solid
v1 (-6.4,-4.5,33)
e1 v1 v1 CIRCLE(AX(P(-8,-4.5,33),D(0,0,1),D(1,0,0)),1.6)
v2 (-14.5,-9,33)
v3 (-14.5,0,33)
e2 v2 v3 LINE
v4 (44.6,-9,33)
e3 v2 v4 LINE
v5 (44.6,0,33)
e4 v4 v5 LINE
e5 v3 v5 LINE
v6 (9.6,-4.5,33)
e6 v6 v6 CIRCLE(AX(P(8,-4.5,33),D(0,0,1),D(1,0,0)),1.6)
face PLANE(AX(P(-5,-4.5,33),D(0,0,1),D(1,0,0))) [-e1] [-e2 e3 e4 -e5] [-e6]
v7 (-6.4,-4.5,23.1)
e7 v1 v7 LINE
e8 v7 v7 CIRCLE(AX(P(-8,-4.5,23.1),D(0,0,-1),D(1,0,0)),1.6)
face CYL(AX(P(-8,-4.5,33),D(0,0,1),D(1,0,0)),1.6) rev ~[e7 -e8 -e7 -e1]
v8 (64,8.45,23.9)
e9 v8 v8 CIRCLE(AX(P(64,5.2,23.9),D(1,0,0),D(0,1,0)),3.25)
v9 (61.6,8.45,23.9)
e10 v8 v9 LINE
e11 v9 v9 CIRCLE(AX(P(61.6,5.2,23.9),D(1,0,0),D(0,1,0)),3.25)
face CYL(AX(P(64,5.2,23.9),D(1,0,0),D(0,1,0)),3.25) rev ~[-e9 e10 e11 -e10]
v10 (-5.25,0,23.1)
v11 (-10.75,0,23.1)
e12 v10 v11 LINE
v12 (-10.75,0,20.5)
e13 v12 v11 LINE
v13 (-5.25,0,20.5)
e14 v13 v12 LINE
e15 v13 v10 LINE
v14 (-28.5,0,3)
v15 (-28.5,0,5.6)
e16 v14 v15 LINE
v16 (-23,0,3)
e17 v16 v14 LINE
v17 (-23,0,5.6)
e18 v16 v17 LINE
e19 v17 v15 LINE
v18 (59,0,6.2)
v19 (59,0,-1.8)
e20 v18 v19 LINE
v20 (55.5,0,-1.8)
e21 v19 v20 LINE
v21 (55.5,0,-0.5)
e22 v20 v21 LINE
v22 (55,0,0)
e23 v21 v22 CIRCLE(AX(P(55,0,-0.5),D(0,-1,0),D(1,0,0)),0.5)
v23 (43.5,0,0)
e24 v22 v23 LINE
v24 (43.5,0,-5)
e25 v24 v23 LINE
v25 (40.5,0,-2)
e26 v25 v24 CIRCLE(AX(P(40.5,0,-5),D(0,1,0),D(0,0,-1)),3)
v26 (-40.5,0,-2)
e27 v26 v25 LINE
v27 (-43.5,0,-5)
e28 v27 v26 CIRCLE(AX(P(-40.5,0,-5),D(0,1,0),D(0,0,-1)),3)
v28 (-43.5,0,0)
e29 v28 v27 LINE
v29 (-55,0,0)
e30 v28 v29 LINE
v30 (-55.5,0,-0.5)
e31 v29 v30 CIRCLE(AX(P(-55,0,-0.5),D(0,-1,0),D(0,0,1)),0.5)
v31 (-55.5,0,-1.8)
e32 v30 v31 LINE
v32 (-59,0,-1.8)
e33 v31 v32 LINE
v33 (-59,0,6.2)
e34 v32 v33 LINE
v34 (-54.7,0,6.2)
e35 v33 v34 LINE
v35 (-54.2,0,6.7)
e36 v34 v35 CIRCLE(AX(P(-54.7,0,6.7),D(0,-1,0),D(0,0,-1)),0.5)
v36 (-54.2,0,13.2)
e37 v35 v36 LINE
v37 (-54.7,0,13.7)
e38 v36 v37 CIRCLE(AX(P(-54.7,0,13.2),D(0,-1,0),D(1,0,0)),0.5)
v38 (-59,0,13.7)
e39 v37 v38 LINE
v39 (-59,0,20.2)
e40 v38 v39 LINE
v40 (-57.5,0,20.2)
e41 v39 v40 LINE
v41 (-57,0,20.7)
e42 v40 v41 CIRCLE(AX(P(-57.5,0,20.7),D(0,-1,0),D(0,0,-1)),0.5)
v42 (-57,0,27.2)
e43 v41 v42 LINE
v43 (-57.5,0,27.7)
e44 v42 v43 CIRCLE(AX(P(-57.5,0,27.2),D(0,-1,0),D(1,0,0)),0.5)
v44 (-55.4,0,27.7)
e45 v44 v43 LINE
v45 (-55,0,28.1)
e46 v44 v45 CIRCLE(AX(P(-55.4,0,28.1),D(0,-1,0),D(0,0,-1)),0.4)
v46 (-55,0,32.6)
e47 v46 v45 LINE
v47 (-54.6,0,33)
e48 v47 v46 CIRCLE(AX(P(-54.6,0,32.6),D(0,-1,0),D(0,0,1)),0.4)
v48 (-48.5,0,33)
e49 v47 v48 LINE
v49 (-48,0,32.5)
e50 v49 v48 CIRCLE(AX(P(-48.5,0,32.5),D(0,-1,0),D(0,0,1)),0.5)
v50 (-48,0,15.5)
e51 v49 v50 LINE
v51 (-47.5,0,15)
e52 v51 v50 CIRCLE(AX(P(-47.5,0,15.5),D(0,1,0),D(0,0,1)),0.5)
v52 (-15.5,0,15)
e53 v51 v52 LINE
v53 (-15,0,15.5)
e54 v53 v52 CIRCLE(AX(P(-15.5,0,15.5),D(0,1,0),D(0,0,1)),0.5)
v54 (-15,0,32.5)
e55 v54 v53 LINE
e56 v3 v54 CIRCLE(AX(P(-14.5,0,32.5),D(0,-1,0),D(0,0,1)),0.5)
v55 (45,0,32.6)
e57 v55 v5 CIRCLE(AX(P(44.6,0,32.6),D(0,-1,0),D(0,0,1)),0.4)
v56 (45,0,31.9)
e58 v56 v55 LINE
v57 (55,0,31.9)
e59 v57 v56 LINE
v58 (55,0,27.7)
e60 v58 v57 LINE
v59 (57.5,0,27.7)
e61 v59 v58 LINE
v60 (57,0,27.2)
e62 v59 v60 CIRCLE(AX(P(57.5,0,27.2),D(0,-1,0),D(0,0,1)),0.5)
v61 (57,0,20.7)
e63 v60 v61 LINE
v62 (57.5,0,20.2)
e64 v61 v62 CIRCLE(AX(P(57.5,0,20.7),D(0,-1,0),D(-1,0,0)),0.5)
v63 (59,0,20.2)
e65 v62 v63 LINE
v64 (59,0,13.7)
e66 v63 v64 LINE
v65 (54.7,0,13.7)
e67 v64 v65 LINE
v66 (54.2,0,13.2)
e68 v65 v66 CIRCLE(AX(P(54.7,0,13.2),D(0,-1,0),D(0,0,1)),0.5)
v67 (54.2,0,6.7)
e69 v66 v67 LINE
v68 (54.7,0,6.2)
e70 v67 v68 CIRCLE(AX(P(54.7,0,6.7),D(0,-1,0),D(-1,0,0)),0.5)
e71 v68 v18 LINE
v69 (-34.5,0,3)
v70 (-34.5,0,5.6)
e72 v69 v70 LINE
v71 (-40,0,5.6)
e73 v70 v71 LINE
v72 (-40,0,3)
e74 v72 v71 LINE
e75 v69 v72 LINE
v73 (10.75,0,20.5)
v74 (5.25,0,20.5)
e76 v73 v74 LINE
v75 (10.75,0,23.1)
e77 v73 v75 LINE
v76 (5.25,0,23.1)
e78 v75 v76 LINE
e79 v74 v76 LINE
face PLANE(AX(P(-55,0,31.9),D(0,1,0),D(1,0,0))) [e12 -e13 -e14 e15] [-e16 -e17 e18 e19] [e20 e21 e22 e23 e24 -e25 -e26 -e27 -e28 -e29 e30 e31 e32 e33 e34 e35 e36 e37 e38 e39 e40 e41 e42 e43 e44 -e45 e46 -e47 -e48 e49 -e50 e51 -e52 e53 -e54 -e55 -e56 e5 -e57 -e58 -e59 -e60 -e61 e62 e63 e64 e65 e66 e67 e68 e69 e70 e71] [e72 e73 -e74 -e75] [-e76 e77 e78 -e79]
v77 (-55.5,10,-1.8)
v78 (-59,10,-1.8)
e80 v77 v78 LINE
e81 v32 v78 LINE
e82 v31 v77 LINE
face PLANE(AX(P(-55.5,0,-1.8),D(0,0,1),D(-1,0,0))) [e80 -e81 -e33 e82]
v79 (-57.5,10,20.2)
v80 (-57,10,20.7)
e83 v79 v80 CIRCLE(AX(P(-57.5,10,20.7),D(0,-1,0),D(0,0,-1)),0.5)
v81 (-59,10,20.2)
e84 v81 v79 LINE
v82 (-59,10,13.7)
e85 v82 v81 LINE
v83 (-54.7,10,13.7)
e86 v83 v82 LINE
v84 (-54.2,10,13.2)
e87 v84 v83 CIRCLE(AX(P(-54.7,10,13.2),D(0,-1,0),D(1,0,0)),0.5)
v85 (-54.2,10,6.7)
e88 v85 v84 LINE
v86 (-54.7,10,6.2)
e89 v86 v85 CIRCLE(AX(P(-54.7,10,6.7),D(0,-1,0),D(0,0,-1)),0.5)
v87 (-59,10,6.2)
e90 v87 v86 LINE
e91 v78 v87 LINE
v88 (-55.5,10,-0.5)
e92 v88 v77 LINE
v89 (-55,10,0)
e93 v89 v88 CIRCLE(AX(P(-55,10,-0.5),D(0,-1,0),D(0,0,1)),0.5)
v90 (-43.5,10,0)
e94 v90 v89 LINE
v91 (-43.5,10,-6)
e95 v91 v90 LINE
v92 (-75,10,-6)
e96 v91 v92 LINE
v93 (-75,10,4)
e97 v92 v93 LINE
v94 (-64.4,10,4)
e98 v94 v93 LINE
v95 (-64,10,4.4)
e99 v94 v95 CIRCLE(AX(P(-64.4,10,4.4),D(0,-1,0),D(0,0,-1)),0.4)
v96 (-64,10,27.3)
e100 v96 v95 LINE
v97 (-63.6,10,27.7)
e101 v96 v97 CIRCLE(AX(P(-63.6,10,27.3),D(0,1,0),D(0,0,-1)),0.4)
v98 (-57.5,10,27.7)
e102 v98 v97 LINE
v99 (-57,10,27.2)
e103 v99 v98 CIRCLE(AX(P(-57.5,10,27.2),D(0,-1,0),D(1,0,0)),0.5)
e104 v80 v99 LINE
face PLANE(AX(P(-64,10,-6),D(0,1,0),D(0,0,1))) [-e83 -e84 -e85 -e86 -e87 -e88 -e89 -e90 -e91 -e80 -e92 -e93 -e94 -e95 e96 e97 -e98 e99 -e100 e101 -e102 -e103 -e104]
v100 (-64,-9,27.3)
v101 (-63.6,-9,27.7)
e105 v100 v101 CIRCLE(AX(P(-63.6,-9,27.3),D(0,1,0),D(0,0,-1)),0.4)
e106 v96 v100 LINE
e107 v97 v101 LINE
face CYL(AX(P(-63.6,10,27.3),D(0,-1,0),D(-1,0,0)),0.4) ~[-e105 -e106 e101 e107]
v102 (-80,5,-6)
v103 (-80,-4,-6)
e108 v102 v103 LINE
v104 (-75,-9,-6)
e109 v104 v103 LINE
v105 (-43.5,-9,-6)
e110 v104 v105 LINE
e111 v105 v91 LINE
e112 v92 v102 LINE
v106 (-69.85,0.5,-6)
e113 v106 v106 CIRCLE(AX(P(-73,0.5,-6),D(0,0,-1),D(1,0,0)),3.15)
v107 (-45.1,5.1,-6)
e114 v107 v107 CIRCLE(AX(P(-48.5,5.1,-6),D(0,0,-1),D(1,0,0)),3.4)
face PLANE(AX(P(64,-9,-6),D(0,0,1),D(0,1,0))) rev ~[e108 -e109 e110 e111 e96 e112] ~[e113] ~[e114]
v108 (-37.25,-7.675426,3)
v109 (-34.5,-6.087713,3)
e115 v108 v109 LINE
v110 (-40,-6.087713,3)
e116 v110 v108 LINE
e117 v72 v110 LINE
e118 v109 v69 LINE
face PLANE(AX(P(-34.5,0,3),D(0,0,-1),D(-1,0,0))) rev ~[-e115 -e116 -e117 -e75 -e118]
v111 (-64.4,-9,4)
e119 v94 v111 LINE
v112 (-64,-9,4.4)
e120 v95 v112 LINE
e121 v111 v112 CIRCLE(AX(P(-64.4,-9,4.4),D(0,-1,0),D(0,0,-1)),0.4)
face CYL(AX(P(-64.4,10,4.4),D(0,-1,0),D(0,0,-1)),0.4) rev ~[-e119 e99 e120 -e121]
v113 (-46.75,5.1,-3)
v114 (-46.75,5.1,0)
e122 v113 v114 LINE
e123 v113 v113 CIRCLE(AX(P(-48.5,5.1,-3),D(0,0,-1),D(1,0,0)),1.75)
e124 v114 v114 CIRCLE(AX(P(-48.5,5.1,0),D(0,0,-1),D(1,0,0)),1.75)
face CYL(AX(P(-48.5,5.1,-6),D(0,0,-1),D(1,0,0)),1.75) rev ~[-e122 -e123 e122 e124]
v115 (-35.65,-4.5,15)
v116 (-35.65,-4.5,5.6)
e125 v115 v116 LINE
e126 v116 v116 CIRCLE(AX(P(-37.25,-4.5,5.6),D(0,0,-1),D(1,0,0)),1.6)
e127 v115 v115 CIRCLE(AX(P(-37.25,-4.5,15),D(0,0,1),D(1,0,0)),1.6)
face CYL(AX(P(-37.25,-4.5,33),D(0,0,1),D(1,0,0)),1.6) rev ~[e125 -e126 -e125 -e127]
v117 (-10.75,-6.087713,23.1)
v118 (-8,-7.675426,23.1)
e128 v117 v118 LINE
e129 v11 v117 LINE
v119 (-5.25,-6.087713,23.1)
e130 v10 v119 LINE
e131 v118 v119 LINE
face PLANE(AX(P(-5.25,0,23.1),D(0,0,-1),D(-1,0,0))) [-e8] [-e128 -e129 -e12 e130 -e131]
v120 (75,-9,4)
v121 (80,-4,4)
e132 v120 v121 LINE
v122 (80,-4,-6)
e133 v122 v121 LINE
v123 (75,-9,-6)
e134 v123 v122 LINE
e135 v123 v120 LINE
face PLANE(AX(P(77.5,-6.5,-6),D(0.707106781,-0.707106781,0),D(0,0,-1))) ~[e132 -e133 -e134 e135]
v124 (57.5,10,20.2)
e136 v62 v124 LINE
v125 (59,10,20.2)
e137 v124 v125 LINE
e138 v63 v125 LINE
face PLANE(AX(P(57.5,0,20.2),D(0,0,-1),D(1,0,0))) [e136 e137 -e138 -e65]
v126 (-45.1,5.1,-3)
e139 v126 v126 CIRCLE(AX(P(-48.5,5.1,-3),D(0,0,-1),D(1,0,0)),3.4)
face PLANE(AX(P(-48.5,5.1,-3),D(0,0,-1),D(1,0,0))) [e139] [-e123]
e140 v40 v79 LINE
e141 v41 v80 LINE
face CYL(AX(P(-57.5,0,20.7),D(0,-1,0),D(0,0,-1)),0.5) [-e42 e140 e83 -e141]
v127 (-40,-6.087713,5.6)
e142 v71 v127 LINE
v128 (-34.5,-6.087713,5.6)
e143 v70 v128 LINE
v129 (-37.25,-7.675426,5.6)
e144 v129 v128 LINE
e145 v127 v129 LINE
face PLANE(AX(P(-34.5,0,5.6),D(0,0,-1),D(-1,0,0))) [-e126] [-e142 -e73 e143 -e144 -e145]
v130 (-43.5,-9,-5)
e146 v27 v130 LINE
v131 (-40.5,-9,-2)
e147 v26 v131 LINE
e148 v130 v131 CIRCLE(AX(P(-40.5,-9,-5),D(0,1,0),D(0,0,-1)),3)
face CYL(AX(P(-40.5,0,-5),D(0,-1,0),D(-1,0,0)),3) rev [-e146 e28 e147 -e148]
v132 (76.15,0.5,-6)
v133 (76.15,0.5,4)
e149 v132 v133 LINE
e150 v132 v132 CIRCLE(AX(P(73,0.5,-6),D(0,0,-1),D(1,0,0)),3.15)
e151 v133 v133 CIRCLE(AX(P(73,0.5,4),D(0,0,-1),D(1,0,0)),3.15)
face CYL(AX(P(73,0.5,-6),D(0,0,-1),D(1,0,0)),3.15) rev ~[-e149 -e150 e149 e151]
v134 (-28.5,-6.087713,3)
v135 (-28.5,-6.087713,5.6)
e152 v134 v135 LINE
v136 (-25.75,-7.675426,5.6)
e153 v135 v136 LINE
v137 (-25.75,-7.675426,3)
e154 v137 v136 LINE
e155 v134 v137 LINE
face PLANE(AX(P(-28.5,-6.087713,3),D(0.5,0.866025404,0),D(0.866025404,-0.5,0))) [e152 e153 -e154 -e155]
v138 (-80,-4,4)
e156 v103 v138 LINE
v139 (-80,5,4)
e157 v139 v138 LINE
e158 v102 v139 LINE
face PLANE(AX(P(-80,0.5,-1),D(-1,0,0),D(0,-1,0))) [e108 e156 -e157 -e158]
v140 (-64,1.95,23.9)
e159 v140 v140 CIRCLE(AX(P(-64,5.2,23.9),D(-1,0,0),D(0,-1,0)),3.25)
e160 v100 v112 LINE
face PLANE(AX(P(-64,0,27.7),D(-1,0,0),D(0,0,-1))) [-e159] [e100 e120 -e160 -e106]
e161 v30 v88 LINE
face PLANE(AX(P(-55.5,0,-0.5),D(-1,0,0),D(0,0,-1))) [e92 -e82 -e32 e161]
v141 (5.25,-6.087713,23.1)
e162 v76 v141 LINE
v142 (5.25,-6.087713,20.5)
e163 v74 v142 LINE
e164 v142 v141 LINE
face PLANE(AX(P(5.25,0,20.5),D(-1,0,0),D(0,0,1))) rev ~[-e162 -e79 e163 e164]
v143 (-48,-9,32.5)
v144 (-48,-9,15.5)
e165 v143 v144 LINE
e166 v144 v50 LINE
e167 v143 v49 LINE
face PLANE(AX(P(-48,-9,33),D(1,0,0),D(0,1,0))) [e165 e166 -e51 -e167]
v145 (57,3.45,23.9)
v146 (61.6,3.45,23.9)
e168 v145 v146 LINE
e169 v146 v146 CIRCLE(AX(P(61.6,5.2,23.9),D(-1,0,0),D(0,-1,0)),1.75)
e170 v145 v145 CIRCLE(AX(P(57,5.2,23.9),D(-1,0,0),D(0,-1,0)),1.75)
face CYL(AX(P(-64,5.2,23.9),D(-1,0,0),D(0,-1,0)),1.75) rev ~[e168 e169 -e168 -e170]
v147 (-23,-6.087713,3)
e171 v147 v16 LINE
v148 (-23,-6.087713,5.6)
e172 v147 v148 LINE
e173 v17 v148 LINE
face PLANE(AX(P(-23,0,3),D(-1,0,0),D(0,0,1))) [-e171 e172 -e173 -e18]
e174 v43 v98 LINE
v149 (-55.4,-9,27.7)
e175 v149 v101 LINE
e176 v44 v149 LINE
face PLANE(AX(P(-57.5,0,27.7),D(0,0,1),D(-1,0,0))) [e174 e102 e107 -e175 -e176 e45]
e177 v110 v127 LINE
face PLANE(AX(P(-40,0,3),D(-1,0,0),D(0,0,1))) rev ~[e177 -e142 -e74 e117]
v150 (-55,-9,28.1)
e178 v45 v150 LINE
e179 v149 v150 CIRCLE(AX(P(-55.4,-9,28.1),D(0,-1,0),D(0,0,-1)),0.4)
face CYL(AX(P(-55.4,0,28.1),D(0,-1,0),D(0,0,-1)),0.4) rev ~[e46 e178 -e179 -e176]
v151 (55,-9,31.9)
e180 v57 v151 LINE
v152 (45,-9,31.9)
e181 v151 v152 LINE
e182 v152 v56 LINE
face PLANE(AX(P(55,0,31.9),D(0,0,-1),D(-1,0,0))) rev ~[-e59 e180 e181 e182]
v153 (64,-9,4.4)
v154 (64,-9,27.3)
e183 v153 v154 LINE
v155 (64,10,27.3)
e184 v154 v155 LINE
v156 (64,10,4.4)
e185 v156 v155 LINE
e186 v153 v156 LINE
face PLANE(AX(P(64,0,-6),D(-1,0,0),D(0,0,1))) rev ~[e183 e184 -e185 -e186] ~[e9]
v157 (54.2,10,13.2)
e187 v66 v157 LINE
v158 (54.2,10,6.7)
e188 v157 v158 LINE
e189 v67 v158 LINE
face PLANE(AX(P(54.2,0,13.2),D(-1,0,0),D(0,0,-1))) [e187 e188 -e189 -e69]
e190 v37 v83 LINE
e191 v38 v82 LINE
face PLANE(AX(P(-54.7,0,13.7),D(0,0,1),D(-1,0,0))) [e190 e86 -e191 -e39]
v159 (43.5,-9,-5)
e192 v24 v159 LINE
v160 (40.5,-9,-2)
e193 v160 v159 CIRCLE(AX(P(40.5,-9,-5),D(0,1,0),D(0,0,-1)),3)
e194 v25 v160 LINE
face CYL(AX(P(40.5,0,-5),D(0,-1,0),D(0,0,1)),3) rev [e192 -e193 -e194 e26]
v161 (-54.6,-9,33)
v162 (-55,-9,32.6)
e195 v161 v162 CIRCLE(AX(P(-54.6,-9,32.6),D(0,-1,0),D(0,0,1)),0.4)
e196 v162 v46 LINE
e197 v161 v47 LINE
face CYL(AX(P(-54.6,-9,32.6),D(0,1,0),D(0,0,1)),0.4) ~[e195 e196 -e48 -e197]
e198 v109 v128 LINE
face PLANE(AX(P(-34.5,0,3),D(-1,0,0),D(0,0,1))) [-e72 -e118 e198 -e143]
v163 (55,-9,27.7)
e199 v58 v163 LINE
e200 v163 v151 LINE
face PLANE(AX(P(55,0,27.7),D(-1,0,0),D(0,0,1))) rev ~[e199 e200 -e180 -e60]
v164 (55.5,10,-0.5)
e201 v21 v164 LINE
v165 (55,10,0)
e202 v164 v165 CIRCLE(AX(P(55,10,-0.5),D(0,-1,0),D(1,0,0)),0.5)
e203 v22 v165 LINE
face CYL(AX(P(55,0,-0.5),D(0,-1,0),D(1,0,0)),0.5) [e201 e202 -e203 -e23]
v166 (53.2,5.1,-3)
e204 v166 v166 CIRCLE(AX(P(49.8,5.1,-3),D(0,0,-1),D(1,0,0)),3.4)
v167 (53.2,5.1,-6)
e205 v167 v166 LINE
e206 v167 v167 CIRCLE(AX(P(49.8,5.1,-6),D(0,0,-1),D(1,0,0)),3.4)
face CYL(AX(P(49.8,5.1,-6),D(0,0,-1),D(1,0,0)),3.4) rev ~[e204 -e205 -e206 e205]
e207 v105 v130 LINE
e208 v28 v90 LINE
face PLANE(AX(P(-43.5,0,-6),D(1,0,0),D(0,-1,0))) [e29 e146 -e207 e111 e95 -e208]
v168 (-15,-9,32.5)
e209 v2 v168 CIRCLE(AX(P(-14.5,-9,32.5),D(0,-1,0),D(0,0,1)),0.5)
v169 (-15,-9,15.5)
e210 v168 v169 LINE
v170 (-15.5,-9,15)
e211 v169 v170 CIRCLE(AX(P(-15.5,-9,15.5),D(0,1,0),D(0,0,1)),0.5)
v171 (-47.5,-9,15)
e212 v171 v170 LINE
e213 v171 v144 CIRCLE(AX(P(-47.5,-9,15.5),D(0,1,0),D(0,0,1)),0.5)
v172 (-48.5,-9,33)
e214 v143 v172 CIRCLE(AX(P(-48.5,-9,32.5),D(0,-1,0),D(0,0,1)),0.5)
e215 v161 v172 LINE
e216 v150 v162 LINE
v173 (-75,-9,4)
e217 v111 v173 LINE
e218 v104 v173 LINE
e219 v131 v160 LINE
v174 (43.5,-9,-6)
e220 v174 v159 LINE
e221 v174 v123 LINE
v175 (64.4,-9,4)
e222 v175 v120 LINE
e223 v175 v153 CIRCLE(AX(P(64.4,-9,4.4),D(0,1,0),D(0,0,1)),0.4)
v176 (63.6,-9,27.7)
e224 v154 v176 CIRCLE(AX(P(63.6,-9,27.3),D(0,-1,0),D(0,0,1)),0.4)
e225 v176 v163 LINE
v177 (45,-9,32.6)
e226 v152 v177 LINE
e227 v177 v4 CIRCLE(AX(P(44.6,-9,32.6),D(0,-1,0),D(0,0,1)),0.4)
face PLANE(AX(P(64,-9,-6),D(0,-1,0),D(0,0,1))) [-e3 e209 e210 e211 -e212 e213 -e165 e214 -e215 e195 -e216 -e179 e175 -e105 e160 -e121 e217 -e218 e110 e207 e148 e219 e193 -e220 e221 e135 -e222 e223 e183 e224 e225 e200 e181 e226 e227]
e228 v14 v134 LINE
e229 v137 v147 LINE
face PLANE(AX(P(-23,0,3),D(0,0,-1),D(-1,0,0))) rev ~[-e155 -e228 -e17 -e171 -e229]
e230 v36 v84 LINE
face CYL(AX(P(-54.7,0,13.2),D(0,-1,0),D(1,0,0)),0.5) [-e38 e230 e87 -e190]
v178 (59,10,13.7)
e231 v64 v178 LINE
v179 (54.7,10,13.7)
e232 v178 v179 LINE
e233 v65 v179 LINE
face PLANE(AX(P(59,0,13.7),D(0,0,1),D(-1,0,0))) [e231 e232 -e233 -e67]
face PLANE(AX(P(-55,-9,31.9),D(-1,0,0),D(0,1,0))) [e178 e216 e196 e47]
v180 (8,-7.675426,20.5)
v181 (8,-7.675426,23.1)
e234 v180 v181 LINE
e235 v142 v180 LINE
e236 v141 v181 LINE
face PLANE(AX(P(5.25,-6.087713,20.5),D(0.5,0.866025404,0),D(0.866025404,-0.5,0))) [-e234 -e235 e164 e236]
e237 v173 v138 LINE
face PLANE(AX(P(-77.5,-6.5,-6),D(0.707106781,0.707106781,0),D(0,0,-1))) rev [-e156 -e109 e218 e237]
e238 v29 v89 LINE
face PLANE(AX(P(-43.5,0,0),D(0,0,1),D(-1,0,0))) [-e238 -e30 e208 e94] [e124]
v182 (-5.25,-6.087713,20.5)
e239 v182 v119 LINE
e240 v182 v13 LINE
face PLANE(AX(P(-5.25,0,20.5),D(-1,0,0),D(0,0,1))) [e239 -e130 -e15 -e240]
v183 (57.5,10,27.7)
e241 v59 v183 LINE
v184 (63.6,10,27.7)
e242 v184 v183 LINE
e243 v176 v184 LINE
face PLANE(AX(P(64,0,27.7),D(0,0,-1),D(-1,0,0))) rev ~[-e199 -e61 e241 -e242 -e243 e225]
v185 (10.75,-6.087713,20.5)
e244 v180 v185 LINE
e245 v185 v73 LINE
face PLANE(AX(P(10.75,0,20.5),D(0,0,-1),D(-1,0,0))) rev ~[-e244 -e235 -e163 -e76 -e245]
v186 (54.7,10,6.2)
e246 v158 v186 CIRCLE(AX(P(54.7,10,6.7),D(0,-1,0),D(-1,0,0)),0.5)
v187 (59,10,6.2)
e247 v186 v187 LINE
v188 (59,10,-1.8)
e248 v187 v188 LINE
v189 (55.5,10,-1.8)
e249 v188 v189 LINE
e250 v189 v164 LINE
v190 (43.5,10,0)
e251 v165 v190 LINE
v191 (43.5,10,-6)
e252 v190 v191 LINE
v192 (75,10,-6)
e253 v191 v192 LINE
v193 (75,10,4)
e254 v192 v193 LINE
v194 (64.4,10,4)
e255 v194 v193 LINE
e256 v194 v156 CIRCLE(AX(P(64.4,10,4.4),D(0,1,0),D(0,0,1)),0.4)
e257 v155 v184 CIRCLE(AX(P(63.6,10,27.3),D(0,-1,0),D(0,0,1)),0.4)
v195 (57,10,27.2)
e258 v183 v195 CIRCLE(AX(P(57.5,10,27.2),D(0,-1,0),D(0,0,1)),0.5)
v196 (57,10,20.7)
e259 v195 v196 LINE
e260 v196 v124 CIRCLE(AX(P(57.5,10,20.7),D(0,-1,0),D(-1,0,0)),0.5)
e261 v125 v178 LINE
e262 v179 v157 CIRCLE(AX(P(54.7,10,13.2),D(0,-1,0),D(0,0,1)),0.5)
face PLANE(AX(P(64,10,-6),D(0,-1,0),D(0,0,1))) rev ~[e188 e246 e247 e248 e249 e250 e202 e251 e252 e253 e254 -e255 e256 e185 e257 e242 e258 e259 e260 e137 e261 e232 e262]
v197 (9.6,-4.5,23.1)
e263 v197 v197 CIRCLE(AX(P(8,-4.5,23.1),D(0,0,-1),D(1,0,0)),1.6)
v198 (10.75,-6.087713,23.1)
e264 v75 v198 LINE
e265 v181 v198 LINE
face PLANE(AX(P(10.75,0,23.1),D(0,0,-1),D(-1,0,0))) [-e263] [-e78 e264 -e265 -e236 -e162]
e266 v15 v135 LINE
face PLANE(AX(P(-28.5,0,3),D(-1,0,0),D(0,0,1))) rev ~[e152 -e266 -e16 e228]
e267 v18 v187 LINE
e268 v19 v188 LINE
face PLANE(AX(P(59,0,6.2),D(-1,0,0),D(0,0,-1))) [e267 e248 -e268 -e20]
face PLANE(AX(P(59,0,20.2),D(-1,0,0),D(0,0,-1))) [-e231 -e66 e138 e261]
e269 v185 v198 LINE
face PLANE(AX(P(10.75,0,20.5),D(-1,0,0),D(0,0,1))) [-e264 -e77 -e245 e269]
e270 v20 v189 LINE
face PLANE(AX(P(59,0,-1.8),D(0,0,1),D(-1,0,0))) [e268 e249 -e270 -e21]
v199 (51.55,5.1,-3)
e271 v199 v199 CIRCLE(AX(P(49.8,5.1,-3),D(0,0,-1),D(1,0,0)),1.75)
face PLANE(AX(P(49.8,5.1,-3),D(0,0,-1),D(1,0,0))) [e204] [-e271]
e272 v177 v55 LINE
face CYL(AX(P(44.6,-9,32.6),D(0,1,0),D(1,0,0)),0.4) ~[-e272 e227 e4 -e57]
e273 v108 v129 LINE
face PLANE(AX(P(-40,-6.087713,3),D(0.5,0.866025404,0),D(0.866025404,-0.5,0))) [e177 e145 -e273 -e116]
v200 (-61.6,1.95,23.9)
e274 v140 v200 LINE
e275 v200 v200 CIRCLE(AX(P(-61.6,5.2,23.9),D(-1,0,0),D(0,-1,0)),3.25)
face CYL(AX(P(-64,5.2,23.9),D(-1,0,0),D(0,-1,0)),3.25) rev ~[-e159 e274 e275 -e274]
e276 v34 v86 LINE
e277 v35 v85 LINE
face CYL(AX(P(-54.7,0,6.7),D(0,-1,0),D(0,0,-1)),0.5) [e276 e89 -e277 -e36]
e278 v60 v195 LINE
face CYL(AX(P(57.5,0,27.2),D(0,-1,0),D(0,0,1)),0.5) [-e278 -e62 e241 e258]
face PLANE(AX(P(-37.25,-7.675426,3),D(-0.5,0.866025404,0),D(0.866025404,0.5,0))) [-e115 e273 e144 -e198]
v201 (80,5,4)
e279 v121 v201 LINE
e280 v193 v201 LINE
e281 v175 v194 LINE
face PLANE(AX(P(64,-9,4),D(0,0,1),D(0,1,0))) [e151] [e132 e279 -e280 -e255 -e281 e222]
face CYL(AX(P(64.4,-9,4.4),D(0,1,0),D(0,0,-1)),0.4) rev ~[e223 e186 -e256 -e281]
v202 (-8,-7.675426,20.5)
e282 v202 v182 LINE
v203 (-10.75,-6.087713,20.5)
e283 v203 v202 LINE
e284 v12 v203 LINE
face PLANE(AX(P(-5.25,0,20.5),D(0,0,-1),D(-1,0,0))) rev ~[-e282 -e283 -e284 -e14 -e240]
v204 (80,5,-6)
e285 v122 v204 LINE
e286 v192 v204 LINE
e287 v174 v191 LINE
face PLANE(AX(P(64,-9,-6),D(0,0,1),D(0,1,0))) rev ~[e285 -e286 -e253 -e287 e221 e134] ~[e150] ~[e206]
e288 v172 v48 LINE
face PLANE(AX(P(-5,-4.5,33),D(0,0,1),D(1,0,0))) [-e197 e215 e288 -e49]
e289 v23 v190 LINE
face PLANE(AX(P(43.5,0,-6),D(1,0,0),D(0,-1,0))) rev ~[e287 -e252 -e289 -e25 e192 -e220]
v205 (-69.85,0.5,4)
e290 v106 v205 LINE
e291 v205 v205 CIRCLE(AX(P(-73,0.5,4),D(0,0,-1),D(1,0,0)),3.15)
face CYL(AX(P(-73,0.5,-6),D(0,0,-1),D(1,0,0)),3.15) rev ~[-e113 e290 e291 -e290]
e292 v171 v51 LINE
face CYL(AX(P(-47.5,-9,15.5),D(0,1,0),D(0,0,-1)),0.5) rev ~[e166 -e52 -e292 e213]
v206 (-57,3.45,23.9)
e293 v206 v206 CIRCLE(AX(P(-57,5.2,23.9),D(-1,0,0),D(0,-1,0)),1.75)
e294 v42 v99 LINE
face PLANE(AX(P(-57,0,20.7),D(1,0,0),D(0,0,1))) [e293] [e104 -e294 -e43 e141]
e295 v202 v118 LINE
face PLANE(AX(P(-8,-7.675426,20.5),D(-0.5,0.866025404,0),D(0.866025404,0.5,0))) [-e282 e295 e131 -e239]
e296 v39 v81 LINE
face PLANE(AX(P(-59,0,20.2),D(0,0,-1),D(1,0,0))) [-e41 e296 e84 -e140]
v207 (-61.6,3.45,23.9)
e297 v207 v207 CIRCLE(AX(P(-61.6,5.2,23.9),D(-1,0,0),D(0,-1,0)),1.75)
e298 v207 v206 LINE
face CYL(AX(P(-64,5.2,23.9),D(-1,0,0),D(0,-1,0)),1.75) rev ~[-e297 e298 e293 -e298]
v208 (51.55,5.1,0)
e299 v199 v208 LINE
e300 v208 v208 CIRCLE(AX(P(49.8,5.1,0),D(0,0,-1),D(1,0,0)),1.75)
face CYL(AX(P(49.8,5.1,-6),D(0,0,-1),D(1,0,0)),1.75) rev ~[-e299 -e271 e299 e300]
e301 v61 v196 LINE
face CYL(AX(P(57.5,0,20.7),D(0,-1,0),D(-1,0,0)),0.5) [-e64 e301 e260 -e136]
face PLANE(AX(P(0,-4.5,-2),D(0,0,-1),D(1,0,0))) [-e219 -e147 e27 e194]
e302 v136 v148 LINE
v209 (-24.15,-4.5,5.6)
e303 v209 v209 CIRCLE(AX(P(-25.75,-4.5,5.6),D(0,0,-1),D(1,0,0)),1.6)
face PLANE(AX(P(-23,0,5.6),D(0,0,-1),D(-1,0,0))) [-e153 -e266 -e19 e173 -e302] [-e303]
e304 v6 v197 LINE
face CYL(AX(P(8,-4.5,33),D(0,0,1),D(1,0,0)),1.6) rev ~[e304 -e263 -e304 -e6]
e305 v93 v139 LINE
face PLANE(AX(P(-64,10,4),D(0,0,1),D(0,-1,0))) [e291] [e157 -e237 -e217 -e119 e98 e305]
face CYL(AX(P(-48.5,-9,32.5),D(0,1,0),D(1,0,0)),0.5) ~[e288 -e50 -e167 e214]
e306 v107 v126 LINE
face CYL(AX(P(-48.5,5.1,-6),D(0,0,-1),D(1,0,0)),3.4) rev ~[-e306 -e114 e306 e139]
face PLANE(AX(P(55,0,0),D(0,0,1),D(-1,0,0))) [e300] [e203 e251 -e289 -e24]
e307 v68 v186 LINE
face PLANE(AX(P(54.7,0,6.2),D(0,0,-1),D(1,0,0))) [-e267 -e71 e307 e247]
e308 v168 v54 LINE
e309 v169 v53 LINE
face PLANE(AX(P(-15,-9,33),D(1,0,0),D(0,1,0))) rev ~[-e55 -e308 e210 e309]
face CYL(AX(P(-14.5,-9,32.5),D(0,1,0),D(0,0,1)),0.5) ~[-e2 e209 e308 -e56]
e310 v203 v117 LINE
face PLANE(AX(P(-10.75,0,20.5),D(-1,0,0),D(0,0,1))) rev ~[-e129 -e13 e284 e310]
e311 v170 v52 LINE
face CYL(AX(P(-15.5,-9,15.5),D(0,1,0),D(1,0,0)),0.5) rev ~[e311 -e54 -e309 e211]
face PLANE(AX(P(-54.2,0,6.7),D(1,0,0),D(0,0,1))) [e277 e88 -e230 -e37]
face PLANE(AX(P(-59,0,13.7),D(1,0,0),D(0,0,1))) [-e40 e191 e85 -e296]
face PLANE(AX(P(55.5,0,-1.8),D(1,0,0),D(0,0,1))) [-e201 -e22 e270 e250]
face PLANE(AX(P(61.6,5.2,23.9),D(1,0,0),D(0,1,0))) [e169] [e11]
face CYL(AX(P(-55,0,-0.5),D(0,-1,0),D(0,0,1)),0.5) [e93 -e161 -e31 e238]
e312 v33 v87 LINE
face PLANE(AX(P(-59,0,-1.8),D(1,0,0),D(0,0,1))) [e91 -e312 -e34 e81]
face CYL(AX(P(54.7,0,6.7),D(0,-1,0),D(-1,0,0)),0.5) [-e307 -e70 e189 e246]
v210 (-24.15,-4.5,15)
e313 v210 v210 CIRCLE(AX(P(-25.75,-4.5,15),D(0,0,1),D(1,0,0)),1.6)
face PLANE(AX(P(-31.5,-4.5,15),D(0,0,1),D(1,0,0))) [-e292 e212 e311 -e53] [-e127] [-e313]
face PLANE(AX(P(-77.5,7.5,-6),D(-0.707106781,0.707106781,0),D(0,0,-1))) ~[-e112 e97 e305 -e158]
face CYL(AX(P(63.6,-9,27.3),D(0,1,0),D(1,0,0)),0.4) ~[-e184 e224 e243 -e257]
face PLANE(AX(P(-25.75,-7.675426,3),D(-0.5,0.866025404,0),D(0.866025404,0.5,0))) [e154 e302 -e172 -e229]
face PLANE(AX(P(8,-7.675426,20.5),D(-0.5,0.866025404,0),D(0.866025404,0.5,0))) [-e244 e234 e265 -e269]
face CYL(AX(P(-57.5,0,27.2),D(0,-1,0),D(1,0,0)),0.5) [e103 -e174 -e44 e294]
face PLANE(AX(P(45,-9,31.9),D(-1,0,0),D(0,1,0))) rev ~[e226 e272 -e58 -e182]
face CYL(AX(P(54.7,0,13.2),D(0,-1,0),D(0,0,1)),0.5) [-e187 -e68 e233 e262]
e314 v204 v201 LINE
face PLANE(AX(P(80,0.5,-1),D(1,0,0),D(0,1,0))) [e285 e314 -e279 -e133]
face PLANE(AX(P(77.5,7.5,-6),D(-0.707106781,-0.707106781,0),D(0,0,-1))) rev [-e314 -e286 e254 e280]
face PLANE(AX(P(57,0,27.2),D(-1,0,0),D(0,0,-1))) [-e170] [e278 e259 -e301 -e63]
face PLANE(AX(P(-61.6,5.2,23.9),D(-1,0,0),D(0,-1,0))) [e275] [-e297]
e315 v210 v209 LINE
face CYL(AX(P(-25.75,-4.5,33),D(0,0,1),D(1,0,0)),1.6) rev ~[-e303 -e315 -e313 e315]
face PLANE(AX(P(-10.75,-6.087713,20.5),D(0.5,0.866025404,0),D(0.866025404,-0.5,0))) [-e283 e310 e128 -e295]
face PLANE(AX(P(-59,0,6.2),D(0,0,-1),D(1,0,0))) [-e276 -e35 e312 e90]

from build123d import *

# Parameters (mm, degrees)
F2_DEPTH  = 9
F3_DEPTH  = 10
F4_R      = 1.75
F5_DEPTH  = 158.2
F4_R_2    = 3.25
F6_DEPTH  = 2.4
F7_R      = 3.25
F8_DEPTH  = 2.4
F9_R      = 3.4
F9_R_2    = 1.75
F10_DEPTH = 3
F11_DEPTH = 25
F12_W     = 100
F12_H     = 9
F13_DEPTH = 1.1
F14_W     = 19
F14_H     = 10
F15_DEPTH = 16
F16_SIZE  = 5
F17_W     = 19
F17_H     = 10
F18_DEPTH = 16
F19_SIZE  = 5
F20_R     = 3.15
F21_DEPTH = 25
F22_R     = 0.4
F23_W     = 87
F23_H     = 9
F24_DEPTH = 4
F25_R     = 3
F26_W     = 33
F26_H     = 9
F26_R     = 1.6
F27_DEPTH = 18
F28_DEPTH = 30
F30_DEPTH = 2.6
F31_R     = 1.6
F32_DEPTH = 12.5
F34_DEPTH = 2.6
F35_W     = 5.5
F35_H     = 2.6
F36_DEPTH = 3.7
F37_R     = 0.5


with BuildPart() as f2:
    # F1 (on face) → F2 (new body)
    with BuildSketch(Plane.XZ):
        Polygon((-55, 27.7), (-64, 27.7), (-64, -6), (0, -6), (64, -6), (64, 27.7), (55, 27.7), (55, 31.9), (0, 31.9), (-55, 31.9), align=None)
    extrude(amount=F2_DEPTH)

    # F0 (on Front) → F3 (join)
    with BuildSketch(Plane.XZ):
        with BuildLine():
            Line((-57.5, 27.7), (-64, 27.7))
            Line((-64, 27.7), (-64, -6))
            Line((-64, -6), (-43.5, -6))
            Line((-43.5, -6), (-43.5, 0))
            Line((-43.5, 0), (-55, 0))
            ThreePointArc((-55, 0), (-55.3535533906, -0.1464466094), (-55.5, -0.5))
            Line((-55.5, -0.5), (-55.5, -1.8))
            Line((-55.5, -1.8), (-59, -1.8))
            Line((-59, -1.8), (-59, 6.2))
            Line((-59, 6.2), (-54.7, 6.2))
            ThreePointArc((-54.7, 6.2), (-54.3464466094, 6.3464466094), (-54.2, 6.7))
            Line((-54.2, 6.7), (-54.2, 13.2))
            ThreePointArc((-54.2, 13.2), (-54.3464466094, 13.5535533906), (-54.7, 13.7))
            Line((-54.7, 13.7), (-59, 13.7))
            Line((-59, 13.7), (-59, 20.2))
            Line((-59, 20.2), (-57.5, 20.2))
            ThreePointArc((-57.5, 20.2), (-57.1464466094, 20.3464466094), (-57, 20.7))
            Line((-57, 20.7), (-57, 27.2))
            ThreePointArc((-57, 27.2), (-57.1464466094, 27.5535533906), (-57.5, 27.7))
        make_face()
        with BuildLine():
            Line((43.5, -6), (64, -6))
            Line((64, -6), (64, 27.7))
            Line((64, 27.7), (57.5, 27.7))
            ThreePointArc((57.5, 27.7), (57.1464466094, 27.5535533906), (57, 27.2))
            Line((57, 27.2), (57, 20.7))
            ThreePointArc((57, 20.7), (57.1464466094, 20.3464466094), (57.5, 20.2))
            Line((57.5, 20.2), (59, 20.2))
            Line((59, 20.2), (59, 13.7))
            Line((59, 13.7), (54.7, 13.7))
            ThreePointArc((54.7, 13.7), (54.3464466094, 13.5535533906), (54.2, 13.2))
            Line((54.2, 13.2), (54.2, 6.7))
            ThreePointArc((54.2, 6.7), (54.3464466094, 6.3464466094), (54.7, 6.2))
            Line((54.7, 6.2), (59, 6.2))
            Line((59, 6.2), (59, -1.8))
            Line((59, -1.8), (55.5, -1.8))
            Line((55.5, -1.8), (55.5, -0.5))
            ThreePointArc((55.5, -0.5), (55.3535533906, -0.1464466094), (55, 0))
            Line((55, 0), (43.5, 0))
            Line((43.5, 0), (43.5, -6))
        make_face()
    extrude(amount=-F3_DEPTH)

    # F4 (on face) → F5 (cut)
    with BuildSketch(Plane(origin=(-64, 0, 0), x_dir=(0, -1, 0), z_dir=(-1, 0, 0))):
        with Locations((-5.2, 23.9)):
            Circle(F4_R)
    extrude(amount=-F5_DEPTH, mode=Mode.SUBTRACT)

    # F4 (on face) → F6 (cut)
    with BuildSketch(Plane(origin=(-64, 0, 0), x_dir=(0, -1, 0), z_dir=(-1, 0, 0))):
        with Locations((-5.2, 23.9)):
            Circle(F4_R_2)
        with Locations((-5.2, 23.9)):
            Circle(F4_R, mode=Mode.SUBTRACT)
    extrude(amount=-F6_DEPTH, mode=Mode.SUBTRACT)

    # F7 (on face) → F8 (cut)
    with BuildSketch(Plane.YZ.offset(64)):
        with Locations((5.2, 23.9)):
            Circle(F7_R)
    extrude(amount=-F8_DEPTH, mode=Mode.SUBTRACT)

    # F9 (on face) → F10 (cut)
    with BuildSketch(Plane(origin=(0, 0, -6), x_dir=(1, 0, 0), z_dir=(0, 0, -1))):
        with Locations((49.8, -5.1)):
            Circle(F9_R)
        with Locations((49.8, -5.1)):
            Circle(F9_R_2, mode=Mode.SUBTRACT)
        with Locations((-48.5, -5.1)):
            Circle(F9_R)
        with Locations((-48.5, -5.1)):
            Circle(F9_R_2, mode=Mode.SUBTRACT)
        with Locations((49.8, -5.1)):
            Circle(F9_R_2)
    extrude(amount=-F10_DEPTH, mode=Mode.SUBTRACT)

    # F9 (on face) → F11 (cut)
    with BuildSketch(Plane(origin=(0, 0, -6), x_dir=(1, 0, 0), z_dir=(0, 0, -1))):
        with Locations((49.8, -5.1)):
            Circle(F9_R_2)
        with Locations((-48.5, -5.1)):
            Circle(F9_R_2)
    extrude(amount=-F11_DEPTH, mode=Mode.SUBTRACT)

    # F12 (on face) → F13 (join)
    with BuildSketch(Plane.XY.offset(31.9)):
        with Locations((-5, -4.5)):
            Rectangle(F12_W, F12_H)
    extrude(amount=F13_DEPTH)

    # F14 (on face) → F15 (join)
    with BuildSketch(Plane(origin=(-64, 0, 0), x_dir=(0, -1, 0), z_dir=(-1, 0, 0))):
        with Locations((-0.5, -1)):
            Rectangle(F14_W, F14_H)
    extrude(amount=F15_DEPTH)

    # F16
    f16_edges = [f2.edges().sort_by_distance(p)[0] for p in [
        (-80, -9, -1),
        (-80, 10, -1),
    ]]
    chamfer(f16_edges, length=F16_SIZE)

    # F17 (on face) → F18 (join)
    with BuildSketch(Plane.YZ.offset(64)):
        with Locations((0.5, -1)):
            Rectangle(F17_W, F17_H)
    extrude(amount=F18_DEPTH)

    # F19
    f19_edges = [f2.edges().sort_by_distance(p)[0] for p in [
        (80, 10, -1),
        (80, -9, -1),
    ]]
    chamfer(f19_edges, length=F19_SIZE)

    # F20 (on face) → F21 (cut)
    with BuildSketch(Plane(origin=(0, 0, -6), x_dir=(1, 0, 0), z_dir=(0, 0, -1))):
        with Locations((-73, -0.5)):
            Circle(F20_R)
        with Locations((73, -0.5)):
            Circle(F20_R)
    extrude(amount=-F21_DEPTH, mode=Mode.SUBTRACT)

    # F22
    f22_edges = [f2.edges().sort_by_distance(p)[0] for p in [
        (64, 0.5, 27.7),
        (45, -4.5, 33),
        (-64, 0.5, 27.7),
        (-55, -4.5, 27.7),
        (-55, -4.5, 33),
        (-64, 0.5, 4),
        (64, 0.5, 4),
    ]]
    fillet(f22_edges, radius=F22_R)

    # F23 (on face) → F24 (cut)
    with BuildSketch(Plane(origin=(0, 0, -6), x_dir=(1, 0, 0), z_dir=(0, 0, -1))):
        with Locations((0, 4.5)):
            Rectangle(F23_W, F23_H)
    extrude(amount=-F24_DEPTH, mode=Mode.SUBTRACT)

    # F25
    f25_edges = [f2.edges().sort_by_distance(p)[0] for p in [
        (-43.5, -4.5, -2),
        (43.5, -4.5, -2),
    ]]
    fillet(f25_edges, radius=F25_R)

    # F26 (on face) → F27 (cut)
    with BuildSketch(Plane.XY.offset(33)):
        with Locations((-31.5, -4.5)):
            Rectangle(F26_W, F26_H)
        with Locations((-37.25, -4.5)):
            Circle(F26_R, mode=Mode.SUBTRACT)
        with Locations((-25.75, -4.5)):
            Circle(F26_R, mode=Mode.SUBTRACT)
    extrude(amount=-F27_DEPTH, mode=Mode.SUBTRACT)

    # F26 (on face) → F28 (cut)
    with BuildSketch(Plane.XY.offset(33)):
        with Locations((-37.25, -4.5)):
            Circle(F26_R)
        with Locations((-25.75, -4.5)):
            Circle(F26_R)
    extrude(amount=-F28_DEPTH, mode=Mode.SUBTRACT)

    # F29 (on face) → F30 (cut)
    with BuildSketch(Plane.XY.offset(3)):
        Polygon((-28.5, -2.9122867597), (-28.5, -6.0877132403), (-25.75, -7.6754264805), (-23, -6.0877132403), (-23, -2.9122867597), (-25.75, -1.3245735195), align=None)
        Polygon((-40, -2.9122867597), (-40, -6.0877132403), (-37.25, -7.6754264805), (-34.5, -6.0877132403), (-34.5, -2.9122867597), (-37.25, -1.3245735195), align=None)
    extrude(amount=F30_DEPTH, mode=Mode.SUBTRACT)

    # F31 (on face) → F32 (cut)
    with BuildSketch(Plane.XY.offset(33)):
        with Locations((-8, -4.5)):
            Circle(F31_R)
        with Locations((8, -4.5)):
            Circle(F31_R)
    extrude(amount=-F32_DEPTH, mode=Mode.SUBTRACT)

    # F33 (on face) → F34 (cut)
    with BuildSketch(Plane.XY.offset(20.5)):
        Polygon((-5.25, -6.0877132403), (-5.25, -2.9122867597), (-8, -1.3245735195), (-10.75, -2.9122867597), (-10.75, -6.0877132403), (-8, -7.6754264805), align=None)
        Polygon((10.75, -6.0877132403), (10.75, -2.9122867597), (8, -1.3245735195), (5.25, -2.9122867597), (5.25, -6.0877132403), (8, -7.6754264805), align=None)
    extrude(amount=F34_DEPTH, mode=Mode.SUBTRACT)

    # F35 (on face) → F36 (cut)
    with BuildSketch(Plane(origin=(0, 0, 0), x_dir=(-1, 0, 0), z_dir=(0, 1, 0))):
        with Locations((-8, 21.8)):
            Rectangle(F35_W, F35_H)
        with Locations((8, 21.8)):
            Rectangle(F35_W, F35_H)
        with Locations((25.75, 4.3)):
            Rectangle(F35_W, F35_H)
        with Locations((37.25, 4.3)):
            Rectangle(F35_W, F35_H)
    extrude(amount=-F36_DEPTH, mode=Mode.SUBTRACT)

    # F37
    f37_edges = [f2.edges().sort_by_distance(p)[0] for p in [
        (-15, -4.5, 33),
        (-15, -4.5, 15),
        (-48, -4.5, 15),
        (-48, -4.5, 33),
    ]]
    fillet(f37_edges, radius=F37_R)


solid = f2.part
